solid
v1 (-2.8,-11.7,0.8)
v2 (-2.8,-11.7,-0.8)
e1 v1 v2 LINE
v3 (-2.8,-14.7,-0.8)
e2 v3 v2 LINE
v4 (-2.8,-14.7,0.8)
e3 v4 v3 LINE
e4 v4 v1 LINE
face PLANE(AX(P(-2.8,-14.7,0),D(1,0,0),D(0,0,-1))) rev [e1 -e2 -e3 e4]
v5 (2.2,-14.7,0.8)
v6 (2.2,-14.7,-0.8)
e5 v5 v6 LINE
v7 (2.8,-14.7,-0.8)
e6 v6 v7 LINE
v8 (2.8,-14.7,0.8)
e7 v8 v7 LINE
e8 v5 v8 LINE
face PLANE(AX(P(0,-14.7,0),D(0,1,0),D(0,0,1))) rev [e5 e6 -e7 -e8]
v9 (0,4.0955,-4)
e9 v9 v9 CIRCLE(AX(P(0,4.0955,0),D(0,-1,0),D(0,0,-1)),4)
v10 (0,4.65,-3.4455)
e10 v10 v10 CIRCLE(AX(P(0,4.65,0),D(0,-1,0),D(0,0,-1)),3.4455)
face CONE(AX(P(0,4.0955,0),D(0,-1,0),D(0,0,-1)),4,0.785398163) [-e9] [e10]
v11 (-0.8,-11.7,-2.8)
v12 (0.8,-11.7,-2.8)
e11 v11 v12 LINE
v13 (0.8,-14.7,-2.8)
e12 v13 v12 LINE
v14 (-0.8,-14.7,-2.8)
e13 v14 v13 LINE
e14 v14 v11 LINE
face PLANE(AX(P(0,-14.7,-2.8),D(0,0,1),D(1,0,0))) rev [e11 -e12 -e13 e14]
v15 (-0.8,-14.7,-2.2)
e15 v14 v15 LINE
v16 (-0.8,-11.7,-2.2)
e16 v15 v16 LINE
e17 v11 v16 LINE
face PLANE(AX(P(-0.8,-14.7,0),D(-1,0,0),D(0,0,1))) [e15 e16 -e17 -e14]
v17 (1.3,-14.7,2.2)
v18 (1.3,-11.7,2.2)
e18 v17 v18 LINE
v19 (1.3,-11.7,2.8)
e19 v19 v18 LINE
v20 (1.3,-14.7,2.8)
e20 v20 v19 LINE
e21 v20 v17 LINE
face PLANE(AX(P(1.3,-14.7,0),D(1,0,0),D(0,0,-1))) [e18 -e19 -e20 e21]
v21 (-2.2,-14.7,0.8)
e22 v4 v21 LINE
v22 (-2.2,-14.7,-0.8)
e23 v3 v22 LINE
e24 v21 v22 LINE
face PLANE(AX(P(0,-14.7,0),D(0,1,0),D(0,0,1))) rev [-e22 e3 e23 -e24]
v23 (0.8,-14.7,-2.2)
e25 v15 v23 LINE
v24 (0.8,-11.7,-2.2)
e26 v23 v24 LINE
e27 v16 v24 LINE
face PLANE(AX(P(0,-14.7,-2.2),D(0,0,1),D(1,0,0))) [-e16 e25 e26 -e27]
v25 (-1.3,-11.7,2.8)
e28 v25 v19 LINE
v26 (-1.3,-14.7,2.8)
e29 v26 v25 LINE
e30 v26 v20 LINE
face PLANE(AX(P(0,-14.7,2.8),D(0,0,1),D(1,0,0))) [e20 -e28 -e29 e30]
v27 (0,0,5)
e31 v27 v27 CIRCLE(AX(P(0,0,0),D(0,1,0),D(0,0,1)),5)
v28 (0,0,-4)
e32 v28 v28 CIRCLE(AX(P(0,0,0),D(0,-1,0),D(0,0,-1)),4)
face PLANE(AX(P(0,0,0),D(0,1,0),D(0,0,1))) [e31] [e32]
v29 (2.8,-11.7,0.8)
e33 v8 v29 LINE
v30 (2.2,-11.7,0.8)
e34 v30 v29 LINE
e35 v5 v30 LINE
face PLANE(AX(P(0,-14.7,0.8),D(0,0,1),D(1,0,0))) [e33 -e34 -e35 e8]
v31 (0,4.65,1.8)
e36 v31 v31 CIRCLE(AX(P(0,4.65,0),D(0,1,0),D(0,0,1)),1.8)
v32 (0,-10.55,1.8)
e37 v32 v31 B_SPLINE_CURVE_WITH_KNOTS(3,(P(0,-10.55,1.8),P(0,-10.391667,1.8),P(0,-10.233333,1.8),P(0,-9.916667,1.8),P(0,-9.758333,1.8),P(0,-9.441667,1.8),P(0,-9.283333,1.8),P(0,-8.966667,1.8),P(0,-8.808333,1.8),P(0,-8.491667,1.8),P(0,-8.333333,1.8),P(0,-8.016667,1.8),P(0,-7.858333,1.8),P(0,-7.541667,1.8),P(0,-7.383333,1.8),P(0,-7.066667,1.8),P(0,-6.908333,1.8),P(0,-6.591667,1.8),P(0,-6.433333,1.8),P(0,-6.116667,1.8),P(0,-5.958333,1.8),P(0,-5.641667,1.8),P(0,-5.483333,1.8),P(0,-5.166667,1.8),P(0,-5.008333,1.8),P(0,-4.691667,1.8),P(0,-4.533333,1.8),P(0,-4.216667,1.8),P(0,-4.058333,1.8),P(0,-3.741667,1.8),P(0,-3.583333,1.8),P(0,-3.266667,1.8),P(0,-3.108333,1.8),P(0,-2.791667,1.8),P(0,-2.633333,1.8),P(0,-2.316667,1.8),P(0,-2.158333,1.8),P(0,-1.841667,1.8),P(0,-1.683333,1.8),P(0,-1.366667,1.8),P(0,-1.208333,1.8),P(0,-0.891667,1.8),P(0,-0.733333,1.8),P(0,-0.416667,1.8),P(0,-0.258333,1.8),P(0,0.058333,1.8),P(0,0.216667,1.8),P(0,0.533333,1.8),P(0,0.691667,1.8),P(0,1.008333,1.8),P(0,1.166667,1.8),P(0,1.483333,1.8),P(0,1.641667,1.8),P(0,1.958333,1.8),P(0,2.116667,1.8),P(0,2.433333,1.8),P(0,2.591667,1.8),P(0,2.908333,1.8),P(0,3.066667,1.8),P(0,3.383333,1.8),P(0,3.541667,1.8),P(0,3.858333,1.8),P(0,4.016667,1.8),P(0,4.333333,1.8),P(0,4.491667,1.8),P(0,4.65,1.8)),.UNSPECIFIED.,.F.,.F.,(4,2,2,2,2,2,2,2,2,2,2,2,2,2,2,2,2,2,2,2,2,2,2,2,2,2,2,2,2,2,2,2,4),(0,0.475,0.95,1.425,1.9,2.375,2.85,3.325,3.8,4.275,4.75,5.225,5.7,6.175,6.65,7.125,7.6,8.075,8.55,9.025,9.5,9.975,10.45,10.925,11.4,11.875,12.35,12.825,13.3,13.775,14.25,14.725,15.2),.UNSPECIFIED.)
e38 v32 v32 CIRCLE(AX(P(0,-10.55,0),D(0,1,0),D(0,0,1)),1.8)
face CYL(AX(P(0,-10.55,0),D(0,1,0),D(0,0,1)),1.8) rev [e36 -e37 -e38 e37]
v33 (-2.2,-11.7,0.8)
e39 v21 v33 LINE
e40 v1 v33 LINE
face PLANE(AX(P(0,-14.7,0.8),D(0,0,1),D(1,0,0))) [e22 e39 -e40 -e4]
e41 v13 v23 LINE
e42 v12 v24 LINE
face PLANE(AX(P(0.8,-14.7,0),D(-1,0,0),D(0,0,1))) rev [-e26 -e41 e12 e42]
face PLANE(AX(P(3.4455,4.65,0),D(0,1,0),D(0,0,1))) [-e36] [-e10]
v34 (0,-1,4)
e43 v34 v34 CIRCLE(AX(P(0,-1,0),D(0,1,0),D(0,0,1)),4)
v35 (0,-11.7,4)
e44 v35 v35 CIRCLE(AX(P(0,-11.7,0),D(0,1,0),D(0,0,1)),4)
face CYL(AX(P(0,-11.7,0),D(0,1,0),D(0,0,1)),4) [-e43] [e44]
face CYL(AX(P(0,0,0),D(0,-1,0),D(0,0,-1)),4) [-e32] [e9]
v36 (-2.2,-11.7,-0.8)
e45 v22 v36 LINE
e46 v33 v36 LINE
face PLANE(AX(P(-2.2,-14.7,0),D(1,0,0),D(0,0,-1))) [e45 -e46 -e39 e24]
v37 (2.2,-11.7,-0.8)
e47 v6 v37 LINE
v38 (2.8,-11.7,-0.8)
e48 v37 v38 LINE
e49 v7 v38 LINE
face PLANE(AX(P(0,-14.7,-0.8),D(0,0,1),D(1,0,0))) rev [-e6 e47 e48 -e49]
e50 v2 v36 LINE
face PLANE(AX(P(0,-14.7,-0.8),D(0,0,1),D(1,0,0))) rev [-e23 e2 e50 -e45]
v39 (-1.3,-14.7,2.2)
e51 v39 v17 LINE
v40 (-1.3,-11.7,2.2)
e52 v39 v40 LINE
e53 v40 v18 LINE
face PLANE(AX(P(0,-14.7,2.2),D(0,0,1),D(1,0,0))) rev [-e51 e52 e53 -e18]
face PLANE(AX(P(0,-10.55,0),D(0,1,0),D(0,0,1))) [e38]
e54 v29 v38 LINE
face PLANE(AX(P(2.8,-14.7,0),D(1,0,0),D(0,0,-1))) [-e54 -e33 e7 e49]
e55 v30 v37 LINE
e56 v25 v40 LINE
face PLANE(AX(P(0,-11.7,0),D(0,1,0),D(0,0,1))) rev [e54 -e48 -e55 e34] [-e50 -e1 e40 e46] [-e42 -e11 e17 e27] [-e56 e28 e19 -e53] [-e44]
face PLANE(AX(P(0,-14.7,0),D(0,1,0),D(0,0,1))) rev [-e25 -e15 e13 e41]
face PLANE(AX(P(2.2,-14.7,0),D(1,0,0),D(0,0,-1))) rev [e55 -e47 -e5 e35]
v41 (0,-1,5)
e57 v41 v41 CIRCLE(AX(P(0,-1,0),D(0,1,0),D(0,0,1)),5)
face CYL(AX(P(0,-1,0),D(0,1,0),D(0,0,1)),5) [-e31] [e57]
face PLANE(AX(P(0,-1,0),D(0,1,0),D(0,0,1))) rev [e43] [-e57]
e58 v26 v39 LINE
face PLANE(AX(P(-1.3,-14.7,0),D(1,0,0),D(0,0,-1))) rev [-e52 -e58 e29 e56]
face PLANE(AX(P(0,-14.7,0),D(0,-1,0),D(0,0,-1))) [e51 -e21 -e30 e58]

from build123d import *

# Parameters (mm, degrees)
SKETCH1_R           = 4
SKETCH1_R_2         = 1.8
SKETCH1_W           = 1.6
SKETCH1_H           = 0.6
SKETCH1_W_2         = 0.6
SKETCH1_H_2         = 1.6
SKETCH1_W_3         = 2.6
BOSS_EXTRUDE1_DEPTH = 11.7
SKETCH1_3_R         = 5
SKETCH1_3_R_2       = 4
BOSS_EXTRUDE2_DEPTH = 1
CUT_EXTRUDE1_START  = 4.65
SKETCH1_7_R         = 1.8
CUT_EXTRUDE1_DEPTH  = 15.2
BOSS_EXTRUDE5_START = -11.7
SKETCH1_8_W         = 0.6
SKETCH1_8_H         = 1.6
SKETCH1_8_W_2       = 1.6
SKETCH1_8_H_2       = 0.6
SKETCH1_8_W_3       = 2.6
BOSS_EXTRUDE5_DEPTH = 3


# Read off the part's stored shape, not the designer's step: M8x1.0 Machine Threads Stud3
with BuildPart() as part:
    # Sketch1 → Boss-Extrude1 (new body)
    with BuildSketch(Plane(origin=(0, 0, 0), x_dir=(1, 0, 0), z_dir=(0, 1, 0))):
        with Locations(Location((0, 0, 0), (0, 0, 270))):
            Circle(SKETCH1_R)
        Circle(SKETCH1_R_2)
        with Locations((0, 2.5)):
            Rectangle(SKETCH1_W, SKETCH1_H)
        with Locations((2.5, 0)):
            Rectangle(SKETCH1_W_2, SKETCH1_H_2)
        with Locations((0, -2.5)):
            Rectangle(SKETCH1_W_3, SKETCH1_H)
        with Locations((-2.5, 0)):
            Rectangle(SKETCH1_W_2, SKETCH1_H_2)
    extrude(amount=-BOSS_EXTRUDE1_DEPTH)

    # Sketch1<3> → Boss-Extrude2 (add)
    with BuildSketch(Plane(origin=(0, 0, 0), x_dir=(1, 0, 0), z_dir=(0, 1, 0))):
        with Locations(Location((0, 0, 0), (0, 0, 270))):
            Circle(SKETCH1_3_R)
        with Locations(Location((0, 0, 0), (0, 0, 270))):
            Circle(SKETCH1_3_R_2, mode=Mode.SUBTRACT)
    extrude(amount=-BOSS_EXTRUDE2_DEPTH)

    # M8x1.0 Machine Threads Stud3 outline → M8x1.0 Machine Threads Stud3 (revolve)
    with BuildSketch(Plane.XY):
        Polygon((4, 0), (4, 4.0955), (3.4455, 4.65), (0, 4.65), (0, 0), align=None)
    revolve(axis=Axis((0, 0, 0), (0, 1, 0)))

    # Sketch1<7> → Cut-Extrude1 (cut)
    with BuildSketch(Plane(origin=(0, 0, 0), x_dir=(1, 0, 0), z_dir=(0, 1, 0)).offset(CUT_EXTRUDE1_START)):
        with Locations(Location((0, 0, 0), (0, 0, 270))):
            Circle(SKETCH1_7_R)
    extrude(amount=-CUT_EXTRUDE1_DEPTH, mode=Mode.SUBTRACT)

    # Sketch1<8> → Boss-Extrude5 (add)
    with BuildSketch(Plane(origin=(0, 0, 0), x_dir=(1, 0, 0), z_dir=(0, 1, 0)).offset(BOSS_EXTRUDE5_START)):
        with Locations((2.5, 0)):
            Rectangle(SKETCH1_8_W, SKETCH1_8_H)
        with Locations((0, 2.5)):
            Rectangle(SKETCH1_8_W_2, SKETCH1_8_H_2)
        with Locations((-2.5, 0)):
            Rectangle(SKETCH1_8_W, SKETCH1_8_H)
        with Locations((0, -2.5)):
            Rectangle(SKETCH1_8_W_3, SKETCH1_8_H_2)
    extrude(amount=-BOSS_EXTRUDE5_DEPTH)


solid = part.part
